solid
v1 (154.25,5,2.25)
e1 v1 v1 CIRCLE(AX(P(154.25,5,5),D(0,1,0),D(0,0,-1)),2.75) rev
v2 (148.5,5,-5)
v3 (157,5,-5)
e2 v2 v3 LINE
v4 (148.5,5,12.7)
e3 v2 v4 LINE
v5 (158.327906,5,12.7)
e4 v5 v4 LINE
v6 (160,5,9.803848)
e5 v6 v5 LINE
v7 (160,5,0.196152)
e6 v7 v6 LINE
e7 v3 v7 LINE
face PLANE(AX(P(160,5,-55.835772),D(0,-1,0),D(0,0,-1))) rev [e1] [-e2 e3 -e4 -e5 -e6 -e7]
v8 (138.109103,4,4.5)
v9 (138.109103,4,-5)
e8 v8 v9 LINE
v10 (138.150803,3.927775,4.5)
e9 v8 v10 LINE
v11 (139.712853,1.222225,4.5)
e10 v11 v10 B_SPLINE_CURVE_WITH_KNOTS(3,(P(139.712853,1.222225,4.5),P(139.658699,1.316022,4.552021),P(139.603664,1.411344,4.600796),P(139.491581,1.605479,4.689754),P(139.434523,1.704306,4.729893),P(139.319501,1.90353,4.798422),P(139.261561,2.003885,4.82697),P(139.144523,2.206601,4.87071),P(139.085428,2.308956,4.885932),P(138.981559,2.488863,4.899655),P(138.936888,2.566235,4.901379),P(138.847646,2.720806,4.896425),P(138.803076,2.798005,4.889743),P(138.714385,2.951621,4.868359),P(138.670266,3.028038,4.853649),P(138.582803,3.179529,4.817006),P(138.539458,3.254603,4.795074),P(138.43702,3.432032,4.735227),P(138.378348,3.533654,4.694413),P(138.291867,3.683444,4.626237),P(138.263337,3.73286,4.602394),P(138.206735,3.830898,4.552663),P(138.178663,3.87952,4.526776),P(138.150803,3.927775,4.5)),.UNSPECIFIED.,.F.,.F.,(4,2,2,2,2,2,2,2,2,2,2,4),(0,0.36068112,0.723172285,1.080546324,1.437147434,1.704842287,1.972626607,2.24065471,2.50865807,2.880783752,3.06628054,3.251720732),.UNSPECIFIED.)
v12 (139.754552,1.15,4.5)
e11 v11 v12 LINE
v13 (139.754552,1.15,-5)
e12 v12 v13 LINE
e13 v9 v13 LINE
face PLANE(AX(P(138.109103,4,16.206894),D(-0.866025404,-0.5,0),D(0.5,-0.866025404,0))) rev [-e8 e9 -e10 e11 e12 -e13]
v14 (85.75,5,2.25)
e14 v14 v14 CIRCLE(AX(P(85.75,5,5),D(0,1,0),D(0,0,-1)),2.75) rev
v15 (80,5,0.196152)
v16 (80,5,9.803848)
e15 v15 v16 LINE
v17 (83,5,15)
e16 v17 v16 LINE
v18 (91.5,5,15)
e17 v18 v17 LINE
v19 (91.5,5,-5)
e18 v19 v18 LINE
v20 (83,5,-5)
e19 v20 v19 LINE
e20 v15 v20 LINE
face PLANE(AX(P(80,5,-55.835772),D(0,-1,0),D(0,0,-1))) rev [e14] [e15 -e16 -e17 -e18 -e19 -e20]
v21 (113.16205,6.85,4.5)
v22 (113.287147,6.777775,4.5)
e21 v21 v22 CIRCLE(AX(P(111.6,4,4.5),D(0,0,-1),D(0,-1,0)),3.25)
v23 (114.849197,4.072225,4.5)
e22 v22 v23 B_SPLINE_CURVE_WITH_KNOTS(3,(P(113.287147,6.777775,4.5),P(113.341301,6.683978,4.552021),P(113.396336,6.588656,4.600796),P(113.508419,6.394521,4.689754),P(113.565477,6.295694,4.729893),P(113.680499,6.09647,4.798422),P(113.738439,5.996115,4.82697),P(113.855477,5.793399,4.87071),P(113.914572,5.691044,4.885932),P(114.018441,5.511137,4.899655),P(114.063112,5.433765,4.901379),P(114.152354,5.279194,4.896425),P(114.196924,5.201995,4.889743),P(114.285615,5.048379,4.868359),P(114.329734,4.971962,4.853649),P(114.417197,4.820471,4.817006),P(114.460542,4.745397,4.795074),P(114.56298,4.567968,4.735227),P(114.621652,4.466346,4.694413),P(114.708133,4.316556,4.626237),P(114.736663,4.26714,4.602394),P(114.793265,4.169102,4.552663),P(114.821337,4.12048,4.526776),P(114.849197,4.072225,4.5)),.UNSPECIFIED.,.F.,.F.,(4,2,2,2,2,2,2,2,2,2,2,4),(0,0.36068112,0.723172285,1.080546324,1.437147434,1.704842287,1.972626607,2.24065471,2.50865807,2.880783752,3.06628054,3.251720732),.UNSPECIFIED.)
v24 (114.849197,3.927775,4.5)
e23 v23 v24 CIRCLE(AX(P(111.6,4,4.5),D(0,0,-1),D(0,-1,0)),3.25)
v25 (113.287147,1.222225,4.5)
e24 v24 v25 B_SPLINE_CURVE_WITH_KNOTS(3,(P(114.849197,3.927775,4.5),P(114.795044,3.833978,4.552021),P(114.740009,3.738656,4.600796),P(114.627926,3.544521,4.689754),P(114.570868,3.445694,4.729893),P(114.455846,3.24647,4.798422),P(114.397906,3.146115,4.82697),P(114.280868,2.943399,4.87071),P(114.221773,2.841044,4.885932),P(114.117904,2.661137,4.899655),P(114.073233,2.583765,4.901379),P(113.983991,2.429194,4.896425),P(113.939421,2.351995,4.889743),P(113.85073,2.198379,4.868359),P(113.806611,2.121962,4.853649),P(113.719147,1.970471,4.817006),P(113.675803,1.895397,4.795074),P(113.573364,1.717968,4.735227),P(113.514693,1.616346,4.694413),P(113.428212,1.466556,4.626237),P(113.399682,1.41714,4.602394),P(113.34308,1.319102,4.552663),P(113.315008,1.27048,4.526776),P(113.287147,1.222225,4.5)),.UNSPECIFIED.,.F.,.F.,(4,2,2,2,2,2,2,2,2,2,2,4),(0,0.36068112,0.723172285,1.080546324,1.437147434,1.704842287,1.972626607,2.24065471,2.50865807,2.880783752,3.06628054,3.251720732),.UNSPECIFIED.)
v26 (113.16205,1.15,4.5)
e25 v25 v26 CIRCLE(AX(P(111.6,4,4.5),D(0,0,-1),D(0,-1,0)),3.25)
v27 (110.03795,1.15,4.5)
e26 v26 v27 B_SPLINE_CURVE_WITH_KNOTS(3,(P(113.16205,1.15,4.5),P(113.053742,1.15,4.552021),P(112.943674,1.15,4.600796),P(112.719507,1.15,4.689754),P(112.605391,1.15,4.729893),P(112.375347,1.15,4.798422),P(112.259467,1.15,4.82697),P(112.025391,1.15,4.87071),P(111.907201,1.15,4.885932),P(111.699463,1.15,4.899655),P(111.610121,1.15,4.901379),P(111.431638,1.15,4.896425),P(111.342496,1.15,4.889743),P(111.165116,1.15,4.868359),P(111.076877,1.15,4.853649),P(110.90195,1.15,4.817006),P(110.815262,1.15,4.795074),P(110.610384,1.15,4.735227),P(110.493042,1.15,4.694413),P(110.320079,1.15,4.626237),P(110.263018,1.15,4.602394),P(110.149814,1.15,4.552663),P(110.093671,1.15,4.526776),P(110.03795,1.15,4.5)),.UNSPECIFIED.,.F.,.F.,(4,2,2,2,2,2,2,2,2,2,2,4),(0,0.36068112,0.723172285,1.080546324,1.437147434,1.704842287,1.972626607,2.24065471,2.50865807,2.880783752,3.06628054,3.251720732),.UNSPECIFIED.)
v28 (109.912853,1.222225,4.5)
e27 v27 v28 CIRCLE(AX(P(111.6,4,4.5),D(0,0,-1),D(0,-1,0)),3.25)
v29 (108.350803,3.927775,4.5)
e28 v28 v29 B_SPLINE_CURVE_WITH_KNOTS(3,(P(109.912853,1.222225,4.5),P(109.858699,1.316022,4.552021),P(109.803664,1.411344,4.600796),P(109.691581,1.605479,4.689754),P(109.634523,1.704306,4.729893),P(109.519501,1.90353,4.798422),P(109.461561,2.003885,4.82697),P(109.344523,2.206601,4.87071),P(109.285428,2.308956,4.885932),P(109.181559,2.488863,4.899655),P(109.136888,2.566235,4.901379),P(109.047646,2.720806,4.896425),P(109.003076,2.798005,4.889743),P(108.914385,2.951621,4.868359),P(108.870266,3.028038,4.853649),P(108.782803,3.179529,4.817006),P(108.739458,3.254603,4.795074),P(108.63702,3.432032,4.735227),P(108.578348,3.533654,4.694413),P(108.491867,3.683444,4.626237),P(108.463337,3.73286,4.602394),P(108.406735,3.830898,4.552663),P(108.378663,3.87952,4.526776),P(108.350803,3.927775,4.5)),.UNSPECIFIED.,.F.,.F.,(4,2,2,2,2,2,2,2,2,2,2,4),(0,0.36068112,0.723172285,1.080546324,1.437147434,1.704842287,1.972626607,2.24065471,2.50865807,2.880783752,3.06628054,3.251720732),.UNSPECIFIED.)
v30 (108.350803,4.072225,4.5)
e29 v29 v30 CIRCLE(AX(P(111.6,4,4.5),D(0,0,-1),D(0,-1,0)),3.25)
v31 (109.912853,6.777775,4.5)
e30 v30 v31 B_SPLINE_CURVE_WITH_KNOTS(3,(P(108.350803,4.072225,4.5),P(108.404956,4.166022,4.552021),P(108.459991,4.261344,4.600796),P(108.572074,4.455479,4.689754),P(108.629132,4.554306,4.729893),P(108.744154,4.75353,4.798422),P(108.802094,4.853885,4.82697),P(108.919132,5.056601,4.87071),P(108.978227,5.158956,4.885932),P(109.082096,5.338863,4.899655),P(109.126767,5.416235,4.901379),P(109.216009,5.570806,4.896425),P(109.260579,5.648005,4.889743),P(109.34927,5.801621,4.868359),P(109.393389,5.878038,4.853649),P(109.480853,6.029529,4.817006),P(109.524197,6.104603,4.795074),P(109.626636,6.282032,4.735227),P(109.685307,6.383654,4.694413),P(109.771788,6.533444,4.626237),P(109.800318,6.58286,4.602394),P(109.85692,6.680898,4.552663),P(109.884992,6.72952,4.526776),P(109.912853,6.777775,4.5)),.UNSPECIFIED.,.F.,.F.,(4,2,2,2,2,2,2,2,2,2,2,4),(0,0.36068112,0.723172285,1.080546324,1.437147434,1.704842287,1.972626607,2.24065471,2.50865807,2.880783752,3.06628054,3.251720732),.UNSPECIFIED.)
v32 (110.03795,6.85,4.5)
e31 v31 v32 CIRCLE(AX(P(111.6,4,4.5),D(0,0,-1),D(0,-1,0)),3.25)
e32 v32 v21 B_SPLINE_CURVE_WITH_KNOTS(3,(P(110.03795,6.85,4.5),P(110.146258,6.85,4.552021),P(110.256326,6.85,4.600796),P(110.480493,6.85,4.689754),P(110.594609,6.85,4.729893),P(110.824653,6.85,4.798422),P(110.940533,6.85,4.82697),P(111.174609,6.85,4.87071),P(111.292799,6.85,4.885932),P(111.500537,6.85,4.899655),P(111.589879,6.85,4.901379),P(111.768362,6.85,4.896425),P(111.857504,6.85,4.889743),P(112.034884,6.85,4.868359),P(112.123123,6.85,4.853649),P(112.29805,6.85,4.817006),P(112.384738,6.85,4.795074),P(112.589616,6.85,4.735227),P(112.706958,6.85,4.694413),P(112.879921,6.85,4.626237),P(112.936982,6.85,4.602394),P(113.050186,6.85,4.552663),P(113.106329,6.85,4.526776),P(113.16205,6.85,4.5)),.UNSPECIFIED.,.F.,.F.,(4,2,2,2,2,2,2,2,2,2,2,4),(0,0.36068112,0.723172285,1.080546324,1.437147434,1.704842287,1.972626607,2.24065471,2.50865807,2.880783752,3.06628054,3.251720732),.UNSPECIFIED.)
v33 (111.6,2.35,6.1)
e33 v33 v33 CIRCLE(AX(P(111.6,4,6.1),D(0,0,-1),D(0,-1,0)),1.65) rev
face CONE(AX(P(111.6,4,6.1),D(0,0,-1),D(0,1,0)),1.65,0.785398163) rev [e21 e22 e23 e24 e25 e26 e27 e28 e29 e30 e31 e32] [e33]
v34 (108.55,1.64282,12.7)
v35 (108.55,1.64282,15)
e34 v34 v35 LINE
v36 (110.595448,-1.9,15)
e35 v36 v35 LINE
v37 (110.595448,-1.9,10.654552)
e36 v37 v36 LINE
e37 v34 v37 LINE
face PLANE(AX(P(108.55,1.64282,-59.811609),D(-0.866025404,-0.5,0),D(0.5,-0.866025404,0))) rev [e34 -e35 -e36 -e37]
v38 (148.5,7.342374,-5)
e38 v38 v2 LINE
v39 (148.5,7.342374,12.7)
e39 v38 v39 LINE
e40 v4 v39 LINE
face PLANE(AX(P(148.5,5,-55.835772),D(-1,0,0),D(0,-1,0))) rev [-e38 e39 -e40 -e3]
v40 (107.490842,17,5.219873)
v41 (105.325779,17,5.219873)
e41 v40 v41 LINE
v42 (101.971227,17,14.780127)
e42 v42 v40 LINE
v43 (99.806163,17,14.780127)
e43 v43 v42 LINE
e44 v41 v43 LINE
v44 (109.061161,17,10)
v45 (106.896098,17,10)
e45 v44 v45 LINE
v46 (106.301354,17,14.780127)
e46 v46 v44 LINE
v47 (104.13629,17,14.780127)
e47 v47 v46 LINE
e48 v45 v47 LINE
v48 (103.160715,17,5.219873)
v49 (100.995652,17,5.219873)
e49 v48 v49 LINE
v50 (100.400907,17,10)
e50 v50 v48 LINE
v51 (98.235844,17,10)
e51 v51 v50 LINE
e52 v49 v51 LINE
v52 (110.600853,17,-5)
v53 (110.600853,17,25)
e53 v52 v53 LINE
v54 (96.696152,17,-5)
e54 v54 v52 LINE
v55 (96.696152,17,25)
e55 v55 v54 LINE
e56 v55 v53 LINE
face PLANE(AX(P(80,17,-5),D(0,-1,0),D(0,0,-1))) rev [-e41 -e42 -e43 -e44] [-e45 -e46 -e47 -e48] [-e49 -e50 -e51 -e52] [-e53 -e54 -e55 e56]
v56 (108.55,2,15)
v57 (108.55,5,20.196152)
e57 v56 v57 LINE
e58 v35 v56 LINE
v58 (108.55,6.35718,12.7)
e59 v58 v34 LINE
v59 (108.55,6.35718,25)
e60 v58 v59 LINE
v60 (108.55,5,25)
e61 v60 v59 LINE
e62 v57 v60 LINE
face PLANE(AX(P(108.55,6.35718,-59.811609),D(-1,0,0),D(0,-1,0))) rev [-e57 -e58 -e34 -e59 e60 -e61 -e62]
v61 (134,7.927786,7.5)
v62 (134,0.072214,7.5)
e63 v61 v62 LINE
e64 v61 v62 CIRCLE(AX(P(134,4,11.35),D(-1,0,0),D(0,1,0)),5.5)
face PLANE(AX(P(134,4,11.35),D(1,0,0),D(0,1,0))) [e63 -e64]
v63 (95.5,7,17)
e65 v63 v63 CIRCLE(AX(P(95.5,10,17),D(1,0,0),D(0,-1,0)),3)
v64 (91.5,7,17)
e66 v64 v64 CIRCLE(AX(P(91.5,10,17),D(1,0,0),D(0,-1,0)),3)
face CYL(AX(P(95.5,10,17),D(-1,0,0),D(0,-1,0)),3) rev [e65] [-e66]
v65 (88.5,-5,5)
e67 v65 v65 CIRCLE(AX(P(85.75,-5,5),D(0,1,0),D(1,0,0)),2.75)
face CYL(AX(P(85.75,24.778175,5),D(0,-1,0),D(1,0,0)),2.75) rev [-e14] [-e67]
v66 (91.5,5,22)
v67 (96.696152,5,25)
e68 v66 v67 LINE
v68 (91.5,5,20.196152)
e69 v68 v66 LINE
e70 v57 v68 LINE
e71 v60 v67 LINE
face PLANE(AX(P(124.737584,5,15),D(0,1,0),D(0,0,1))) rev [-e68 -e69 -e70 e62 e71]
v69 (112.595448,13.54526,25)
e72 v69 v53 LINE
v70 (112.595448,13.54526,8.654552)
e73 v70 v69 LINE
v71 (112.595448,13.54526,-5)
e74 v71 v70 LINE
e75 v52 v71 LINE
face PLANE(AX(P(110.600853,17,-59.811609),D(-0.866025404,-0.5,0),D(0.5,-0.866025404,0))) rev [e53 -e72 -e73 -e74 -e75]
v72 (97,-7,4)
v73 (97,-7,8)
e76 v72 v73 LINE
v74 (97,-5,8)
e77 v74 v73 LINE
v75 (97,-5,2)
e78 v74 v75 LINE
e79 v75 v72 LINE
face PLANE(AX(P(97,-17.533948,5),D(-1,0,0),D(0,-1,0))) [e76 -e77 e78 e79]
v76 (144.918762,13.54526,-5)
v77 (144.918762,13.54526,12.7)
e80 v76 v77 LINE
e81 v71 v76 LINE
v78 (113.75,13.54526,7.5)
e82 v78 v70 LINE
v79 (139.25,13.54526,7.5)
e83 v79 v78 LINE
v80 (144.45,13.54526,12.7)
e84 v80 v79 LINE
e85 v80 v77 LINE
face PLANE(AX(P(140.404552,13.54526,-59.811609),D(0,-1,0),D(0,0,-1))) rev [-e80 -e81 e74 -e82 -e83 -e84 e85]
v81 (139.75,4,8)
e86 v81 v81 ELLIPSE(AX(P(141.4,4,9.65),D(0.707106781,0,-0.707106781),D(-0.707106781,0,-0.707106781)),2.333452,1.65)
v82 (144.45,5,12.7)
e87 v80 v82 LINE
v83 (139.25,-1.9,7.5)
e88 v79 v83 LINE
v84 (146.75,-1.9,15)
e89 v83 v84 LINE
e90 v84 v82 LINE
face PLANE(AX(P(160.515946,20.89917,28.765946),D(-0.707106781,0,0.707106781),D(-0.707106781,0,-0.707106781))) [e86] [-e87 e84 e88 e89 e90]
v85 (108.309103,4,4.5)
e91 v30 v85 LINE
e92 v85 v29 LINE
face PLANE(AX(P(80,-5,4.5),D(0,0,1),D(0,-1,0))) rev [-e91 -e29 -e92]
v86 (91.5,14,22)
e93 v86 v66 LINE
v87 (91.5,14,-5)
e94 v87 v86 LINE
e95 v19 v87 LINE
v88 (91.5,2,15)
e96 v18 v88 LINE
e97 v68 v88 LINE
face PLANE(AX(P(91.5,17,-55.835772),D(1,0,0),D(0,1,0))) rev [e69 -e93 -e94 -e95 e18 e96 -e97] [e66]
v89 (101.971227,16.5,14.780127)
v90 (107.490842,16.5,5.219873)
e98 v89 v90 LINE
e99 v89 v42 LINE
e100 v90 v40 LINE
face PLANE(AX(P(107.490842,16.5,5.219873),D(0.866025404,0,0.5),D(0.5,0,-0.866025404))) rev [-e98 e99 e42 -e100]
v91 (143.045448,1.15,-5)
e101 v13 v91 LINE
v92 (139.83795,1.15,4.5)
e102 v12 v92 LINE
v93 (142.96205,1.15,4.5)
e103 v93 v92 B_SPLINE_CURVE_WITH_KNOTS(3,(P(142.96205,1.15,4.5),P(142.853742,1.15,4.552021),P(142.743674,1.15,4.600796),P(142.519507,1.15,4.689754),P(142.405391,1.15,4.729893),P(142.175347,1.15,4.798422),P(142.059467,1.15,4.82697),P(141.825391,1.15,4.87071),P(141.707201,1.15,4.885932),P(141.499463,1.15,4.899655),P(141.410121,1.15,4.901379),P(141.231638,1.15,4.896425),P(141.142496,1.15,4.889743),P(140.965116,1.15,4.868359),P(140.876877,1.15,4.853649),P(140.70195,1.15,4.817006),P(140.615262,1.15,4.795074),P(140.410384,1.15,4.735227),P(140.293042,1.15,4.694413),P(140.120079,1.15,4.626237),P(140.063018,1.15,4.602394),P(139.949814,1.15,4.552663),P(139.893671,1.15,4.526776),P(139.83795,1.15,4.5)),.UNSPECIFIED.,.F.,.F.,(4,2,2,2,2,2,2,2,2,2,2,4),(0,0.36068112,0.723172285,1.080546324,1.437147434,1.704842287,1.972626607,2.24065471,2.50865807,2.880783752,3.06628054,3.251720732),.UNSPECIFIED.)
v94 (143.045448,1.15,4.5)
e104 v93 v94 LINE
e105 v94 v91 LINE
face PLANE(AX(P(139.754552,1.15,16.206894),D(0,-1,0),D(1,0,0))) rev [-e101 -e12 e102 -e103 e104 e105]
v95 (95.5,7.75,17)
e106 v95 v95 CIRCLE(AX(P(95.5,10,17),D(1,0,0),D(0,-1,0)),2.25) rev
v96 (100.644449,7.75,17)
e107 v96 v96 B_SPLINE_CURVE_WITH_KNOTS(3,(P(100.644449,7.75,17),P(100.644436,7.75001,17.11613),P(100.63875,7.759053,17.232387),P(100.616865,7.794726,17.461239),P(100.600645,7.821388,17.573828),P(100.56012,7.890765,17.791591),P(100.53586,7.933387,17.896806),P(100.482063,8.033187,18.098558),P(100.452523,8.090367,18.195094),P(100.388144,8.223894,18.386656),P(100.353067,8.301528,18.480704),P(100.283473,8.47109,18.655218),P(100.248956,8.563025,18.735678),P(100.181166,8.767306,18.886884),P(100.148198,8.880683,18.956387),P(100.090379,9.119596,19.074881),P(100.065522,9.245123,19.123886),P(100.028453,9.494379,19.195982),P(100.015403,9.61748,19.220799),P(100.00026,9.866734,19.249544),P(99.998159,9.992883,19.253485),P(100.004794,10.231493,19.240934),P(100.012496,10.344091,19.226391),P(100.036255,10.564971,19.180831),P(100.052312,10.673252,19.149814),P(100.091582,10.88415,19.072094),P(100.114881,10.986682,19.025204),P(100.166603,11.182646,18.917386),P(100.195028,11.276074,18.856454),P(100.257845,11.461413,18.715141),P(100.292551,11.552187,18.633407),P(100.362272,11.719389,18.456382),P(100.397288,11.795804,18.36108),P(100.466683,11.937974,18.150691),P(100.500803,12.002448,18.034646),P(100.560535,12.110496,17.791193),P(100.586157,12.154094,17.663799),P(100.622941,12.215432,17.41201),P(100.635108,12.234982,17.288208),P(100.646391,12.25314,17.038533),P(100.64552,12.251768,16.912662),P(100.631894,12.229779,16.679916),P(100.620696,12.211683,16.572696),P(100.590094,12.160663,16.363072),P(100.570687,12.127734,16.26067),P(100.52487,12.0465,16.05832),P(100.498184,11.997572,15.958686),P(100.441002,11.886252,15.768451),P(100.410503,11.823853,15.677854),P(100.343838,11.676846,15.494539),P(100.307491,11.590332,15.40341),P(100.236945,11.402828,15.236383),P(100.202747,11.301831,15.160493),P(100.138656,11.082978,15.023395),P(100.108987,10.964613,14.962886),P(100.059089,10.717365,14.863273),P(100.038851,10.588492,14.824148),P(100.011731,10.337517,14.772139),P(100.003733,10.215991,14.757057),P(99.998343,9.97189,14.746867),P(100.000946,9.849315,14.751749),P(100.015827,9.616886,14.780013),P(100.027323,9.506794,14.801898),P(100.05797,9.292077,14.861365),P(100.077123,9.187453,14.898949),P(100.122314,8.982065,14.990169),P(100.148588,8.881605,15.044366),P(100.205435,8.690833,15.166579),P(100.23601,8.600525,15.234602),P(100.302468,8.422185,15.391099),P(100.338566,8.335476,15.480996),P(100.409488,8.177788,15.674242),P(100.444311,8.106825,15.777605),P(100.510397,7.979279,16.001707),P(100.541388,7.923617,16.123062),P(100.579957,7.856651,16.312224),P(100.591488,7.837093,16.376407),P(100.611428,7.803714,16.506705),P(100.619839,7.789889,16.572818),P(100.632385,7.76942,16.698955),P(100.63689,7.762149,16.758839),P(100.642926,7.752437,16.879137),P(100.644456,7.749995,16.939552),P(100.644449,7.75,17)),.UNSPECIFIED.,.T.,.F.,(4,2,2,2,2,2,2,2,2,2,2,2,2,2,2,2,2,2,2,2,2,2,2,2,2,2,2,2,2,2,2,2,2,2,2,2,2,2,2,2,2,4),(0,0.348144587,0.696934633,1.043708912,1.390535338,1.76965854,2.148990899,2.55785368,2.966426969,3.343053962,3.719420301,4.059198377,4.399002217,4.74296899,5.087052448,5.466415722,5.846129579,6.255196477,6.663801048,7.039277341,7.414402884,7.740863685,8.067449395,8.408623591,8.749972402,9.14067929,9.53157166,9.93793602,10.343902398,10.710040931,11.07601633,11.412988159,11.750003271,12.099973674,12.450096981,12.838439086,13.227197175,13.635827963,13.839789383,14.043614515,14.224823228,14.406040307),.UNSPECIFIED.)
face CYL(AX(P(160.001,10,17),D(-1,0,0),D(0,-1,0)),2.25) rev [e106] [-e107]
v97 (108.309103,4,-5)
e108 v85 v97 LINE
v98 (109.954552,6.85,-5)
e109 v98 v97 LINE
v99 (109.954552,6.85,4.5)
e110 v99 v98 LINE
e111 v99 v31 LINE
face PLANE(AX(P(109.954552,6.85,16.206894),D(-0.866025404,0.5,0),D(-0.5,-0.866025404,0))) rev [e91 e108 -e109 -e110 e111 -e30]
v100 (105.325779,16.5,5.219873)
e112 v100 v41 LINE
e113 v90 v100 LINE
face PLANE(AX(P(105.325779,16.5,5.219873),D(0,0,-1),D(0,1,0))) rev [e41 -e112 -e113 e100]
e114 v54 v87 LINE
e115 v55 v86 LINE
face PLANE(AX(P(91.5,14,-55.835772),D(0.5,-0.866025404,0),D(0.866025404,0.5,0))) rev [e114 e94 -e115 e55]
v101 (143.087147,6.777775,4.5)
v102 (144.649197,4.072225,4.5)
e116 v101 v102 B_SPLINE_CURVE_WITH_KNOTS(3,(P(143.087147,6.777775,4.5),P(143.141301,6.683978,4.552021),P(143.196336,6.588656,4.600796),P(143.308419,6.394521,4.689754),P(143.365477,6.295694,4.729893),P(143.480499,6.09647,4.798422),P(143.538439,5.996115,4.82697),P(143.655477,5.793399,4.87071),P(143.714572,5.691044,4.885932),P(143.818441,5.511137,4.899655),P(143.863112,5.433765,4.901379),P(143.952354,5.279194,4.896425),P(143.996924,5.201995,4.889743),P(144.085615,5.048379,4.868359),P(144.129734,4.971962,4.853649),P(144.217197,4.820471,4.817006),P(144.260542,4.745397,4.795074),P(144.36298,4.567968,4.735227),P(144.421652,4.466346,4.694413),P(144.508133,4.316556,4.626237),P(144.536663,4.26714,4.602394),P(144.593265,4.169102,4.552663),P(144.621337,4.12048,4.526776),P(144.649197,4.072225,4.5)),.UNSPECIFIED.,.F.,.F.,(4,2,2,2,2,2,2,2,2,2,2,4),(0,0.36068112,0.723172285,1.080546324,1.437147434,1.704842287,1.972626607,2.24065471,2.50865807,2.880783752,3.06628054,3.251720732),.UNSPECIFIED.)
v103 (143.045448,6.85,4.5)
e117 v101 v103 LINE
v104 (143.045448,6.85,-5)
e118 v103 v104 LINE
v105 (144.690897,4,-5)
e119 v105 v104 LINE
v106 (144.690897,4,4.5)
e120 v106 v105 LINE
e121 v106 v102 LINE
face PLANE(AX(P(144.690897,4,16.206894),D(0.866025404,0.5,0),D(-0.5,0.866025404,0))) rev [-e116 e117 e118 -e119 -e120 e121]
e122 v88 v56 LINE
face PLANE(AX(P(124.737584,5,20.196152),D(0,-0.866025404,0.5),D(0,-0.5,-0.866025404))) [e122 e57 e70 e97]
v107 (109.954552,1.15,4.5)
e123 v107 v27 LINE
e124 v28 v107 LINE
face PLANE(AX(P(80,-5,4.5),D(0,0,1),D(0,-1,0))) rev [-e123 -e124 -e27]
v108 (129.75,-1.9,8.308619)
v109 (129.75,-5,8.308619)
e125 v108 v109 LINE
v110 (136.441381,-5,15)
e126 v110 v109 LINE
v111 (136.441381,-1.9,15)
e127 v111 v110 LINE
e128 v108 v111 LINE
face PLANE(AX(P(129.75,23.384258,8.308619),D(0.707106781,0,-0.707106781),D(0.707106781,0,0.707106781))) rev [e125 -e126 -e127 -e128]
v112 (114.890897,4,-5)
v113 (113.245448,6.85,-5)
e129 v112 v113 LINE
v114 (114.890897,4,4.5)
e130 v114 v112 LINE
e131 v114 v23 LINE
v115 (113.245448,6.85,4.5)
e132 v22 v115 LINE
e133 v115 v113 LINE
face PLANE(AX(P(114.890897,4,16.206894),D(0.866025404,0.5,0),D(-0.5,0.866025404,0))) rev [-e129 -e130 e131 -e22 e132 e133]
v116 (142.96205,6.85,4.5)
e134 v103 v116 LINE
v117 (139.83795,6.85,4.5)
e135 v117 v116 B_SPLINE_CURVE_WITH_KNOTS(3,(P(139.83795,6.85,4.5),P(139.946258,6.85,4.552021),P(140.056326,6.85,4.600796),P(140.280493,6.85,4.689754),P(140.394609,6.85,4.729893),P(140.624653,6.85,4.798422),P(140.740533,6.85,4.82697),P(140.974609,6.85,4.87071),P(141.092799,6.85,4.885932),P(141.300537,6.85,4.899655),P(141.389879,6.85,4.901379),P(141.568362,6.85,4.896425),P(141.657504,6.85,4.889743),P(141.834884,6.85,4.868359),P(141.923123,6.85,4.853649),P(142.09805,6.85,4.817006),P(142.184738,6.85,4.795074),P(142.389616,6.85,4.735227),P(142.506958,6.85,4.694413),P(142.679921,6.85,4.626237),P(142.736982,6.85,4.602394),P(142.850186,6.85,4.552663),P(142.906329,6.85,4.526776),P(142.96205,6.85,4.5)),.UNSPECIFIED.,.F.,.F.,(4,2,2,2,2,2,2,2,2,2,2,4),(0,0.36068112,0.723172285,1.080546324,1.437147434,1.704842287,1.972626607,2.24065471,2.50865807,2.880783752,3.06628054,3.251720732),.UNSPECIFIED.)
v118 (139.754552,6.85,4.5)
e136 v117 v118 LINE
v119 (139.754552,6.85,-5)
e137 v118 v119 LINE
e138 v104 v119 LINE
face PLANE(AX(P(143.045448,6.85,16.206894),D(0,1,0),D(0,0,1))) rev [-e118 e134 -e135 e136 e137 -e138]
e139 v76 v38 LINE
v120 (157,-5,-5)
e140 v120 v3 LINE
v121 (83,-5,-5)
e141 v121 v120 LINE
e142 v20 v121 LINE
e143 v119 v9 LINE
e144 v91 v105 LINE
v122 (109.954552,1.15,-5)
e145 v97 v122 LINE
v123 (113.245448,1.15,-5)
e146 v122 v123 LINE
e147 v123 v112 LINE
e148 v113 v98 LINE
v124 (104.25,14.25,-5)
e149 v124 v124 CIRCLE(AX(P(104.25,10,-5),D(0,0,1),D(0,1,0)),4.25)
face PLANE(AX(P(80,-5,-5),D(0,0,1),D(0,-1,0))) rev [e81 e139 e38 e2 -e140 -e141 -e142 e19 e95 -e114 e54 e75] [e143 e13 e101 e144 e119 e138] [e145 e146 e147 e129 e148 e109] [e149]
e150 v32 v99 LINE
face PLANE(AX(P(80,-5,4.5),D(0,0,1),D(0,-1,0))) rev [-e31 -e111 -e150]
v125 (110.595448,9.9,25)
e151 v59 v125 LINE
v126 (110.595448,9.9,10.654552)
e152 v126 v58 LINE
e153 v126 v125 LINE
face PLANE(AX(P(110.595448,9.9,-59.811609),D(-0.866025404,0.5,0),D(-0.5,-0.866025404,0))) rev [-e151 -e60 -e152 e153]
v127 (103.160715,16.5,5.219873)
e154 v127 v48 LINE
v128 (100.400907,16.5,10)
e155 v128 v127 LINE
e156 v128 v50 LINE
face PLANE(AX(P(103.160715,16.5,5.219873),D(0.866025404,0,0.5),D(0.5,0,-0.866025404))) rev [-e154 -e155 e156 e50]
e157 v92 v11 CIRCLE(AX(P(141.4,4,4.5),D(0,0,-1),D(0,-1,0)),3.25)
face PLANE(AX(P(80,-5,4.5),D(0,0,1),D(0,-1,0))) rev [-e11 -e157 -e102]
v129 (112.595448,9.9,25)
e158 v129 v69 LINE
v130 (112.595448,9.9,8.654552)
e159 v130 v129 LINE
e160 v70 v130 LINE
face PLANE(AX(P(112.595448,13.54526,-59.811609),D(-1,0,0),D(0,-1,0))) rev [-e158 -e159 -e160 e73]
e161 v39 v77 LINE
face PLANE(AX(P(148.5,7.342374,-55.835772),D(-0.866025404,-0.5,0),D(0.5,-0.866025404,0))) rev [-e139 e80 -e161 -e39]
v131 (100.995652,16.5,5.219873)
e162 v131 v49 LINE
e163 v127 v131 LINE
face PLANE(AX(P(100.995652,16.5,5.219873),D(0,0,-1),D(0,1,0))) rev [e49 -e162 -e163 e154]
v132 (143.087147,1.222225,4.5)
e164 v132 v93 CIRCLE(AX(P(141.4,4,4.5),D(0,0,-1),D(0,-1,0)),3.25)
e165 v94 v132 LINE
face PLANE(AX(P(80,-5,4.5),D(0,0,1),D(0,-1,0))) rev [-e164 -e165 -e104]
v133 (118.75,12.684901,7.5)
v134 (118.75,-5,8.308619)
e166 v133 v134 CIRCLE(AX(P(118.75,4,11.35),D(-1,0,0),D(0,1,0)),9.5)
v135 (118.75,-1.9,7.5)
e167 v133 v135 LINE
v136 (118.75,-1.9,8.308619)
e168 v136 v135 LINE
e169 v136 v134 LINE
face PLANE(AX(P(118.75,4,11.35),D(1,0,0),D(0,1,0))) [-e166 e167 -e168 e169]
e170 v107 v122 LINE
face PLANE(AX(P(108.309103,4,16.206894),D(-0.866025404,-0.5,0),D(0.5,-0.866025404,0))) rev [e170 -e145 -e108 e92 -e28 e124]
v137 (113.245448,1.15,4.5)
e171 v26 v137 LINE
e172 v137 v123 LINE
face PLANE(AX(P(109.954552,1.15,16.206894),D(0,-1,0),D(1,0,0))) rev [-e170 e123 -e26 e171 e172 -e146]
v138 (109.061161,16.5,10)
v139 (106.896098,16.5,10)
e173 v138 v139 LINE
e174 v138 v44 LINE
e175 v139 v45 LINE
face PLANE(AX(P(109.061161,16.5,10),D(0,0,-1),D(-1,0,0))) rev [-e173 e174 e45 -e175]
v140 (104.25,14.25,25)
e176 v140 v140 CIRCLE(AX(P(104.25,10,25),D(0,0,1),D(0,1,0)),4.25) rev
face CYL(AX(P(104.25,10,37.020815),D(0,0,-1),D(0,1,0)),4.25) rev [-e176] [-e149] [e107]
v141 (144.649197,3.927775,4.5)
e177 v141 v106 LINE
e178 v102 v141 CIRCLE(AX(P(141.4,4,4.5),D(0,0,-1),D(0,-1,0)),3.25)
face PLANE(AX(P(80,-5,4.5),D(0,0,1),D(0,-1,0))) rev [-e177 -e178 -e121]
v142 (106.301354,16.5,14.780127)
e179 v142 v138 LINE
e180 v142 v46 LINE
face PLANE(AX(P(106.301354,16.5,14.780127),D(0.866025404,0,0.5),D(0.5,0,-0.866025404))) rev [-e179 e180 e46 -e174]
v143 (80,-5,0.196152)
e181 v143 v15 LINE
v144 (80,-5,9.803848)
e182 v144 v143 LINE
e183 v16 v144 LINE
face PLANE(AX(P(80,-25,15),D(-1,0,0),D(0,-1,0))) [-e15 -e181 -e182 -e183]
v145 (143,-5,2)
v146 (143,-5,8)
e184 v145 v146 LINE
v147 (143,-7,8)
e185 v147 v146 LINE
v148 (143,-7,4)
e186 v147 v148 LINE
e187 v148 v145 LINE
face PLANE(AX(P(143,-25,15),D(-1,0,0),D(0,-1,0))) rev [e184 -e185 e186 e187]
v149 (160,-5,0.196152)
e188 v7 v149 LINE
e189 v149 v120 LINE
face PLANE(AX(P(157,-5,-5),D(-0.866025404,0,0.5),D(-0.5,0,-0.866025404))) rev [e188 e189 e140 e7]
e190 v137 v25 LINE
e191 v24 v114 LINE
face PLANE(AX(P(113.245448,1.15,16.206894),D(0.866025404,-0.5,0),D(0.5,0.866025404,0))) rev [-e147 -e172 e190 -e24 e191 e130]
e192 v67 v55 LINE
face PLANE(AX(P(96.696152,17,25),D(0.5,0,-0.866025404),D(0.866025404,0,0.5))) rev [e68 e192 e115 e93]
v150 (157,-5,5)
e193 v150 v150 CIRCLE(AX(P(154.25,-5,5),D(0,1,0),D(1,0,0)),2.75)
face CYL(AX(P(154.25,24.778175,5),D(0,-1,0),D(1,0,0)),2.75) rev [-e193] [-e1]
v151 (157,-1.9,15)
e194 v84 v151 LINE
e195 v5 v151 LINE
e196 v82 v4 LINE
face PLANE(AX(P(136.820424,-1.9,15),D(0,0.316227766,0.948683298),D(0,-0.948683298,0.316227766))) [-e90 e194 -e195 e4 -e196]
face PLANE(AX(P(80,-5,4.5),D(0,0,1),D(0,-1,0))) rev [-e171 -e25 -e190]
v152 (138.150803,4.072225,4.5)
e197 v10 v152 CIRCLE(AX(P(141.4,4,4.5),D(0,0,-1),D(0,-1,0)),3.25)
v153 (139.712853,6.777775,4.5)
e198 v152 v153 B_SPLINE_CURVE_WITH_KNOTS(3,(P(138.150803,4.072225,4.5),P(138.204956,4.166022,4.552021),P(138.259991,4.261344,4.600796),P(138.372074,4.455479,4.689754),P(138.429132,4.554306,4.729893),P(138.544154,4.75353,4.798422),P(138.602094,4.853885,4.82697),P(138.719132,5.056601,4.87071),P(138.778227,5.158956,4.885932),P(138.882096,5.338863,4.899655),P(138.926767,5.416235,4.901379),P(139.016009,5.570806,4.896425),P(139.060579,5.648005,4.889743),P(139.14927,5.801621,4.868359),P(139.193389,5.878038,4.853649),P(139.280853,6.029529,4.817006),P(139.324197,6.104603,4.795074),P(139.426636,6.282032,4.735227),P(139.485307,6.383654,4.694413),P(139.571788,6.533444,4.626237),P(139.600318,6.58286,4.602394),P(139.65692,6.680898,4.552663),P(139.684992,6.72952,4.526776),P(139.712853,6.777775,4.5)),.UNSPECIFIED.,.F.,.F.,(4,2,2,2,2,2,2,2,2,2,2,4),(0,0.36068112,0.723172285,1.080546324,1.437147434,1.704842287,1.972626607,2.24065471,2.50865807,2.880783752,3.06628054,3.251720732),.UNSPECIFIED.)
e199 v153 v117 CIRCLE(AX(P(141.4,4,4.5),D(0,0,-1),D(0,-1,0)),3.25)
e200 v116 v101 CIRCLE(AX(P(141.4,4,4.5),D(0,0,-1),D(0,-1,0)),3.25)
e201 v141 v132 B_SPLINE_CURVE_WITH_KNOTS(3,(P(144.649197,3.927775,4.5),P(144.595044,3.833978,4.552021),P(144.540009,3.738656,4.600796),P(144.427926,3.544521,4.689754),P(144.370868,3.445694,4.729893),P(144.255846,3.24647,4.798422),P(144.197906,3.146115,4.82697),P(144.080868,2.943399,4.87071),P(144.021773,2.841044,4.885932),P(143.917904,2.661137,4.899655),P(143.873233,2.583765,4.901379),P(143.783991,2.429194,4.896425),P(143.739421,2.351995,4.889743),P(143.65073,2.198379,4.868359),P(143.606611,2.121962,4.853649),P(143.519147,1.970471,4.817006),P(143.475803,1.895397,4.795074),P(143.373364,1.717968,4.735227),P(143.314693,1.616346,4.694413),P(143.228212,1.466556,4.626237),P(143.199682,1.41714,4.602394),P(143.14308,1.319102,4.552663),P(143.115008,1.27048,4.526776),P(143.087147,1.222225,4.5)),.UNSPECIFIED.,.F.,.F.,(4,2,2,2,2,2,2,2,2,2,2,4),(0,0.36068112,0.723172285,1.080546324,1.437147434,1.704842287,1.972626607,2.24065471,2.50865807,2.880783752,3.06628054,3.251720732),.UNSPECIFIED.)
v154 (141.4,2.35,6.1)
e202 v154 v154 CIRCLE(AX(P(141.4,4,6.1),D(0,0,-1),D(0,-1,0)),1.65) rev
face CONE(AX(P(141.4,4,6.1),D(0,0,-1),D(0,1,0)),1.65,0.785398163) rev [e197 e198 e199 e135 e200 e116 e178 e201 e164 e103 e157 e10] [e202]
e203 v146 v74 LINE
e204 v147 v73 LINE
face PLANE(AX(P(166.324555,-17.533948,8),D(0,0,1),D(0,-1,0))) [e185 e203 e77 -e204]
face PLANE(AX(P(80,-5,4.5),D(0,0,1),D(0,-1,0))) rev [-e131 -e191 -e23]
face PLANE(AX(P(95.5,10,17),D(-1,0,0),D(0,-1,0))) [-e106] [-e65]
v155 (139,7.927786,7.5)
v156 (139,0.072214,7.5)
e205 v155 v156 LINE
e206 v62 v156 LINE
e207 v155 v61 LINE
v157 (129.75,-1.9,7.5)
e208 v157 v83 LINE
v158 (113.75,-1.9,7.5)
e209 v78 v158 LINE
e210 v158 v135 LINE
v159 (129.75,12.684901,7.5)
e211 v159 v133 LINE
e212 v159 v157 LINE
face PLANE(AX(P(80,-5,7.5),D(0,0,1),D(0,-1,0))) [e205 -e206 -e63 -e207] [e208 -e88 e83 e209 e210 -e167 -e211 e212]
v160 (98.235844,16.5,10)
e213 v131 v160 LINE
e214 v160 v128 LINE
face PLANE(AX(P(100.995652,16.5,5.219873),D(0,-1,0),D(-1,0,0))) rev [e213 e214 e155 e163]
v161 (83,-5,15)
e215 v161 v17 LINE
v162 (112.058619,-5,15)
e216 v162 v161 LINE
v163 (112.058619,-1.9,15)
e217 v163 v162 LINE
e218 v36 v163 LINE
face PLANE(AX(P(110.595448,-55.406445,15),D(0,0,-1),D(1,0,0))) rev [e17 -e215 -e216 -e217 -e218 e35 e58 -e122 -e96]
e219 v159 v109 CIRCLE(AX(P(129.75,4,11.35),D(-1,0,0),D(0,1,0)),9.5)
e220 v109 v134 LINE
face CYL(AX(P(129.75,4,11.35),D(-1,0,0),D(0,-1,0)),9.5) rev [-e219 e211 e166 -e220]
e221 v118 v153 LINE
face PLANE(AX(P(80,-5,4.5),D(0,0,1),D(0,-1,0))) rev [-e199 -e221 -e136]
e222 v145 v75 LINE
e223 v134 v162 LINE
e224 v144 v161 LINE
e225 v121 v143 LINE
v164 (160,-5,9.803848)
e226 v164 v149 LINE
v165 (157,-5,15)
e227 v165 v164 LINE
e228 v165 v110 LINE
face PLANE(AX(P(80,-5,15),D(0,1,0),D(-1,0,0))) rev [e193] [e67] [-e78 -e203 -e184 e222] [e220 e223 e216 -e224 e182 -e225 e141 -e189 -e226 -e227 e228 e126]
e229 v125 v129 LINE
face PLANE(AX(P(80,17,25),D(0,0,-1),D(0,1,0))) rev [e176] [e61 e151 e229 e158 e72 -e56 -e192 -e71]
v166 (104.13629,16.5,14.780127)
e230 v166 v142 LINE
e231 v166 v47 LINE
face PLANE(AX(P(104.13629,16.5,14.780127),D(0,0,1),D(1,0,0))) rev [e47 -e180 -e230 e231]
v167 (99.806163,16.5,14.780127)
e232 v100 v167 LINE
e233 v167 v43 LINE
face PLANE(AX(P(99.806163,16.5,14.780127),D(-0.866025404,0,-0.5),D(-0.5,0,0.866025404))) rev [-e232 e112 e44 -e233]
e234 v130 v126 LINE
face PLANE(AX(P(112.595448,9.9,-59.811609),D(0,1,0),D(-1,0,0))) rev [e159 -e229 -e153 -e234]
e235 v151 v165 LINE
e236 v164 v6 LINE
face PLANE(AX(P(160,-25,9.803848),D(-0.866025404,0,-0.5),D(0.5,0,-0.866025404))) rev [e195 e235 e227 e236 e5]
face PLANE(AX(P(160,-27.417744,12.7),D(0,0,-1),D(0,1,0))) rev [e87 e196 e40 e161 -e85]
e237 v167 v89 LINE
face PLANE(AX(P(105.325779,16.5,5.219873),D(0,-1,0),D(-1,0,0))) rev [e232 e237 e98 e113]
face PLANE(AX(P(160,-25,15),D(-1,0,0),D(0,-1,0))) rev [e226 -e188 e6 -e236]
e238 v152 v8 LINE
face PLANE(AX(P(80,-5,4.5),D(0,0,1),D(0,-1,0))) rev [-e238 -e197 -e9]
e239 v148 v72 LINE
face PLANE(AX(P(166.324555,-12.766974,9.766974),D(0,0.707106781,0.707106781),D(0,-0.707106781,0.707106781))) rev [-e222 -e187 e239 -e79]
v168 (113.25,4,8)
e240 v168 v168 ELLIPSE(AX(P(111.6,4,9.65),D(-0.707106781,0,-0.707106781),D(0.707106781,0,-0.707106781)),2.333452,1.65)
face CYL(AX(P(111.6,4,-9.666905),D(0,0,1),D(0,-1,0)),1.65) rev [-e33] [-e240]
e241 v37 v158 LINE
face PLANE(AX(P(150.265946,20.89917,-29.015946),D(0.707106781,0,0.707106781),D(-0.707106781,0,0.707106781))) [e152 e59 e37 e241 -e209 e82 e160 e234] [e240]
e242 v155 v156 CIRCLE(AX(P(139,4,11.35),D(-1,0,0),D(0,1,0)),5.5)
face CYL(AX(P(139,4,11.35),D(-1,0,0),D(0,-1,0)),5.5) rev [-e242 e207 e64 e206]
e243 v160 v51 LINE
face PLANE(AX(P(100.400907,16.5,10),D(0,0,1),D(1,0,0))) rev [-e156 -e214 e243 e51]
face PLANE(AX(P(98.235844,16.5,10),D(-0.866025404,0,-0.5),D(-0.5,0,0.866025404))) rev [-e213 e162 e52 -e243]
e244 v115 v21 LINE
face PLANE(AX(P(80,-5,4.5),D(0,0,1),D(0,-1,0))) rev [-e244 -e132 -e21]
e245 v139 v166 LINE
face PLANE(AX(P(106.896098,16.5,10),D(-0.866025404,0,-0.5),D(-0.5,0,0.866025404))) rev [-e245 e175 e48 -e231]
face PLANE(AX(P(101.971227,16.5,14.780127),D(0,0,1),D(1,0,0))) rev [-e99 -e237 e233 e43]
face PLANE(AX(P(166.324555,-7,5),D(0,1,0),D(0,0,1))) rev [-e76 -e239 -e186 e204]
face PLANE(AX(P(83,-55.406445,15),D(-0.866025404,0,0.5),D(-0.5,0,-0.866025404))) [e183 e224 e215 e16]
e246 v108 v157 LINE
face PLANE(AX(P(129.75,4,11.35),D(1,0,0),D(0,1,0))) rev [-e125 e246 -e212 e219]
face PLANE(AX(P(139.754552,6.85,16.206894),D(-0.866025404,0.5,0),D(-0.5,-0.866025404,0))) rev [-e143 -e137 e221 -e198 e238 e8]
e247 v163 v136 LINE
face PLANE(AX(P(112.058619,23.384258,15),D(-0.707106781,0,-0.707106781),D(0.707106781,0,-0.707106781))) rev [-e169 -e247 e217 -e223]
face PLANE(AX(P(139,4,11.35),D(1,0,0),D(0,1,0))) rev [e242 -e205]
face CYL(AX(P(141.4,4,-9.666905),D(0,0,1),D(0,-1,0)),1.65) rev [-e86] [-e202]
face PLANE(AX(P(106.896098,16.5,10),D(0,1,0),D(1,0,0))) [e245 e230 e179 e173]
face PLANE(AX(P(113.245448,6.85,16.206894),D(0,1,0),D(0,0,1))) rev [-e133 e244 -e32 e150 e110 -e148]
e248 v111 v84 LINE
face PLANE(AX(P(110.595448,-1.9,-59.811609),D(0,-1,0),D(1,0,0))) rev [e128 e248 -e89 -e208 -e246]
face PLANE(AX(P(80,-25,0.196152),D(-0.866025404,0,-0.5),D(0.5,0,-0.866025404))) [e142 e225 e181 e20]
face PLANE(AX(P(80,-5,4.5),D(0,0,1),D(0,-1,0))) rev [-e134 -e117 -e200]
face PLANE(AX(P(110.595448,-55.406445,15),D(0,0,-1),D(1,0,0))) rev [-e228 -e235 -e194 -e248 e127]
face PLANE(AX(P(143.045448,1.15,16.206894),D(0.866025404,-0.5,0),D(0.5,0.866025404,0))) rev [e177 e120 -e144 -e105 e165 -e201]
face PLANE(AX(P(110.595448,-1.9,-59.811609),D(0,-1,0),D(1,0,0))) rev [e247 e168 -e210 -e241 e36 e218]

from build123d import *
from OCP.BRepFilletAPI import BRepFilletAPI_MakeChamfer

# Parameters (mm, degrees)
AUFSATZ_LINEAR_AUSTRAGEN1_DEPTH       = 80
SKIZZE2_R                             = 4.25
SCHNITT_LINEAR_AUSTRAGEN1_DEPTH       = 30
SKIZZE3_R                             = 1.65
SCHNITT_LINEAR_AUSTRAGEN2_DEPTH       = 17.5
SKIZZE4_R                             = 1.65
SCHNITT_LINEAR_AUSTRAGEN3_DEPTH       = 30
SCHNITT_LINEAR_START                  = -22
SKIZZE5_R                             = 2.75
SCHNITT_LINEAR_AUSTRAGEN4_DEPTH       = 22
SKIZZE6_R                             = 2.75
SCHNITT_LINEAR_AUSTRAGEN5_DEPTH       = 10
SCHNITT_LINEAR_AUSTRAGEN6_DEPTH       = 9.5
SCHNITT_LINEAR_START_2                = -12.5
SKIZZE8_W                             = 11.5
SKIZZE8_H                             = 12
SCHNITT_LINEAR_AUSTRAGEN7_DEPTH       = 30
SCHNITT_LINEAR_START_3                = 10.2
SKIZZE9_R                             = 9.5
SCHNITT_LINEAR_AUSTRAGEN8_DEPTH       = 11
SCHNITT_LINEAR_START_4                = 25.45
SKIZZE10_R                            = 5.5
SCHNITT_LINEAR_AUSTRAGEN9_DEPTH       = 5
AUFSATZ_LINEAR_START                  = -18.545259589
AUFSATZ_LINEAR_AUSTRAGEN2_DEPTH       = 15.445259589
SCHNITT_LINEAR_START_5                = -20.5
SKIZZE12_R                            = 1.65
SCHNITT_LINEAR_AUSTRAGEN10_DEPTH      = 20.5
FASE1_SIZE                            = 1.6
SKIZZE15_W                            = 20
SKIZZE15_H                            = 10
SCHNITT_LINEAR_AUSTRAGEN12_DEPTH      = 80
SCHNITT_LINEAR_START_6                = -15.44526
SCHNITT_LINEAR_AUSTRAGEN13_DEPTH      = 15.44526
SCHNITT_LINEAR_START_7                = -3.1
SKIZZE17_W                            = 49.404551733
SKIZZE17_H                            = 10
SCHNITT_LINEAR_AUSTRAGEN14_DEPTH      = 3.1
SCHNITT_LINEAR_AUSTRAGEN17_DEPTH      = 11
AUFSATZ_LINEAR_AUSTRAGEN3_REACH       = 87.346
SKIZZE21_W                            = 10
SKIZZE21_H                            = 10
SCHNITT_LINEAR_AUSTRAGEN18_DEPTH      = 30.595448267
SCHNITT_LINEAR_AUSTRAGEN19_REACH      = 76.674
SCHNITT_LINEAR_AUSTRAGEN19_END_RADIUS = 4.25
SKIZZE22_R                            = 2.25
SKIZZE23_R                            = 3
SCHNITT_LINEAR_AUSTRAGEN20_DEPTH      = 4
FASE2_SIZE                            = 3
FASE2_SIZE2                           = 5.196152423
AUFSATZ_LINEAR_START_2                = -17
AUFSATZ_LINEAR_AUSTRAGEN4_DEPTH       = 46
FASE3_SIZE                            = 3
FASE3_SIZE2                           = 5.196152423
FASE4_SIZE                            = 3
FASE4_SIZE2                           = 5.196152423
SCHNITT_LINEAR_AUSTRAGEN23_DEPTH      = 3.1
SCHNITT_LINEAR_AUSTRAGEN22_DEPTH      = 0.5
K_RPER_VERSCHIEBEN_KOPIEREN1_ANGLE    = 90


# Read off the part's stored shape, not the designer's step: Aufsatz-Linear austragen2, Schnitt-Linear austragen17
with BuildPart() as part:
    # Skizze1 → Aufsatz-Linear austragen1 (new body)
    with BuildSketch(Plane(origin=(0, 0, 0), x_dir=(0, 0, -1), z_dir=(1, 0, 0))):
        Polygon((0, 0), (0, 20), (-22, 20), (-22, -10), (20, -10), (20, 0), align=None)
    extrude(amount=AUFSATZ_LINEAR_AUSTRAGEN1_DEPTH)

    # Skizze2 → Schnitt-Linear austragen1 (cut)
    with BuildSketch(Plane(origin=(0, 20, 0), x_dir=(1, 0, 0), z_dir=(0, 1, 0))):
        with Locations(Location((55.75, -15, 0), (0, 0, 270))):
            Circle(SKIZZE2_R)
    extrude(amount=-SCHNITT_LINEAR_AUSTRAGEN1_DEPTH, mode=Mode.SUBTRACT)

    # Skizze3 → Schnitt-Linear austragen2 (cut)
    with BuildSketch(Plane.XZ.offset(10)):
        Polygon((49.399147039, 22), (47.404551733, 18.545259589), (47.404551733, 14.9), (49.404551733, 14.9), (51.45, 11.357179677), (51.45, 6.642820323), (49.404551733, 3.1), (17.595448267, 3.1), (15.55, 6.642820323), (15.55, 11.357179677), (17.595448267, 14.9), (19.595448267, 14.9), (19.595448267, 18.545259589), (0, 18.545259589), (0, 22), align=None)
        with Locations(Location((48.4, 9, 0), (0, 0, 270))):
            Circle(SKIZZE3_R, mode=Mode.SUBTRACT)
        with Locations(Location((18.6, 9, 0), (0, 0, 270))):
            Circle(SKIZZE3_R, mode=Mode.SUBTRACT)
    extrude(amount=-SCHNITT_LINEAR_AUSTRAGEN2_DEPTH, mode=Mode.SUBTRACT)

    # Skizze4 → Schnitt-Linear austragen3 (cut)
    with BuildSketch(Plane.XZ.offset(10)):
        with Locations(Location((18.6, 9, 0), (0, 0, 270))):
            Circle(SKIZZE4_R)
        with Locations(Location((48.4, 9, 0), (0, 0, 270))):
            Circle(SKIZZE4_R)
    extrude(amount=-SCHNITT_LINEAR_AUSTRAGEN3_DEPTH, mode=Mode.SUBTRACT)

    # Skizze5 → Schnitt-Linear austragen4 (cut)
    with BuildSketch(Plane(origin=(0, 0, 0), x_dir=(-1, 0, 0), z_dir=(0, 0, -1)).offset(SCHNITT_LINEAR_START)):
        with Locations((-5.75, 10)):
            Circle(SKIZZE5_R)
        with Locations((-74.25, 10)):
            Circle(SKIZZE5_R)
    extrude(amount=SCHNITT_LINEAR_AUSTRAGEN4_DEPTH, mode=Mode.SUBTRACT)

    # Skizze6 → Schnitt-Linear austragen5 (cut)
    with BuildSketch(Plane(origin=(0, 0, 0), x_dir=(1, 0, 0), z_dir=(0, 1, 0))):
        with Locations(Location((40, 10, 0), (0, 0, 270))):
            Circle(SKIZZE6_R)
    extrude(amount=-SCHNITT_LINEAR_AUSTRAGEN5_DEPTH, mode=Mode.SUBTRACT)

    # Skizze7 → Schnitt-Linear austragen6 (cut)
    with BuildSketch(Plane(origin=(0, 20, 0), x_dir=(1, 0, 0), z_dir=(0, 1, 0))):
        Polygon((21.890896534, -9), (20.245448267, -6.15), (16.954551733, -6.15), (15.309103466, -9), (16.954551733, -11.85), (20.245448267, -11.85), align=None)
        Polygon((51.690896534, -9), (50.045448267, -6.15), (46.754551733, -6.15), (45.109103466, -9), (46.754551733, -11.85), (50.045448267, -11.85), align=None)
    extrude(amount=-SCHNITT_LINEAR_AUSTRAGEN6_DEPTH, mode=Mode.SUBTRACT)

    # Skizze8 → Schnitt-Linear austragen7 (cut)
    with BuildSketch(Plane.XZ.offset(-7.5).offset(SCHNITT_LINEAR_START_2)):
        Polygon((49.399147039, 22), (47.404551733, 18.545259589), (15.081237719, 18.545259589), (11.5, 12.342373906), (11.5, 10), (0, 10), (0, 22), align=None)
        with Locations((74.25, 16)):
            Rectangle(SKIZZE8_W, SKIZZE8_H)
    extrude(amount=SCHNITT_LINEAR_AUSTRAGEN7_DEPTH, mode=Mode.SUBTRACT)

    # Skizze9 → Schnitt-Linear austragen8 (cut)
    with BuildSketch(Plane.ZY.offset(-51.45).offset(SCHNITT_LINEAR_START_3)):
        with Locations((9, 3.65)):
            Circle(SKIZZE9_R)
    extrude(amount=SCHNITT_LINEAR_AUSTRAGEN8_DEPTH, mode=Mode.SUBTRACT)

    # Skizze10 → Schnitt-Linear austragen9 (cut)
    with BuildSketch(Plane.ZY.offset(-51.45).offset(SCHNITT_LINEAR_START_4)):
        with Locations((9, 3.65)):
            Circle(SKIZZE10_R)
    extrude(amount=SCHNITT_LINEAR_AUSTRAGEN9_DEPTH, mode=Mode.SUBTRACT)

    # Aufsatz-Linear austragen2 outline → Aufsatz-Linear austragen2 (add)
    with BuildSketch(Plane(origin=(0, 0, 0), x_dir=(-1, 0, 0), z_dir=(0, 0, -1)).offset(AUFSATZ_LINEAR_START)):
        Polygon((-46.25, 7.5), (-51.45, 7.5), (-51.45, 2.3), align=None)
        Polygon((-15.55, 7.5), (-20.75, 7.5), (-15.55, 2.3), align=None)
    extrude(amount=AUFSATZ_LINEAR_AUSTRAGEN2_DEPTH)

    # Skizze12 → Schnitt-Linear austragen10 (cut)
    with BuildSketch(Plane(origin=(0, 10.5, 0), x_dir=(1, 0, 0), z_dir=(0, 1, 0)).offset(SCHNITT_LINEAR_START_5)):
        with Locations(Location((18.6, -9, 0), (0, 0, 90))):
            Circle(SKIZZE12_R)
        with Locations(Location((48.4, -9, 0), (0, 0, 90))):
            Circle(SKIZZE12_R)
    extrude(amount=SCHNITT_LINEAR_AUSTRAGEN10_DEPTH, mode=Mode.SUBTRACT)

    # Fase1
    # the kernel refuses this chamfer: 1.6 mm, written as the material it takes off along each edge
    with BuildSketch(Plane(origin=(18.6, 10.5, 9), x_dir=(0, 0, -1), z_dir=(-1, 0, 0))) as fase1_piece_1_section:
        Polygon((1.65 + FASE1_SIZE, 0), (1.65, FASE1_SIZE), (1.65, 0), align=None)
    fase1_piece_1 = revolve(axis=Axis((18.6, 10.5, 9), (0, -1, 0)), mode=Mode.PRIVATE)
    fase1_piece_1 = split(fase1_piece_1, bisect_by=Plane(origin=(20.016275588, 9.716390068, 12.246938724), z_dir=(-0.8660254037844389, 0, -0.4999999999999995)), keep=Keep.TOP, mode=Mode.PRIVATE)
    fase1_piece_1 = split(fase1_piece_1, bisect_by=Plane(origin=(18.6, 9.716390068, 11.85), z_dir=(0, 0, -1)), keep=Keep.TOP, mode=Mode.PRIVATE)
    fase1_piece_1 = split(fase1_piece_1, bisect_by=Plane(origin=(22.120069214, 9.716390068, 9.396938724), z_dir=(-0.8660254037844397, 0, 0.4999999999999981)), keep=Keep.TOP, mode=Mode.PRIVATE)
    fase1_piece_1 = split(fase1_piece_1, bisect_by=Plane(origin=(17.183724412, 9.716390068, 12.246938724), z_dir=(0.8660254037844387, 0, -0.4999999999999999)), keep=Keep.TOP, mode=Mode.PRIVATE)
    fase1_piece_1 = split(fase1_piece_1, bisect_by=Plane(origin=(18.6, 9.716390068, 6.15), z_dir=(0, 0, 1)), keep=Keep.TOP, mode=Mode.PRIVATE)
    fase1_piece_1 = split(fase1_piece_1, bisect_by=Plane(origin=(15.079930786, 9.716390068, 9.396938724), z_dir=(0.8660254037844385, 0, 0.5000000000000003)), keep=Keep.TOP, mode=Mode.PRIVATE)
    add(fase1_piece_1, mode=Mode.SUBTRACT)
    with BuildSketch(Plane(origin=(48.4, 10.5, 9), x_dir=(0, 0, -1), z_dir=(-1, 0, 0))) as fase1_piece_2_section:
        Polygon((1.65 + FASE1_SIZE, 0), (1.65, FASE1_SIZE), (1.65, 0), align=None)
    fase1_piece_2 = revolve(axis=Axis((48.4, 10.5, 9), (0, -1, 0)), mode=Mode.PRIVATE)
    fase1_piece_2 = split(fase1_piece_2, bisect_by=Plane(origin=(49.816275588, 9.716390068, 12.246938724), z_dir=(-0.8660254037844392, 0, -0.4999999999999991)), keep=Keep.TOP, mode=Mode.PRIVATE)
    fase1_piece_2 = split(fase1_piece_2, bisect_by=Plane(origin=(48.4, 9.716390068, 11.85), z_dir=(0, 0, -1)), keep=Keep.TOP, mode=Mode.PRIVATE)
    fase1_piece_2 = split(fase1_piece_2, bisect_by=Plane(origin=(51.920069214, 9.716390068, 9.396938724), z_dir=(-0.8660254037844392, 0, 0.49999999999999917)), keep=Keep.TOP, mode=Mode.PRIVATE)
    fase1_piece_2 = split(fase1_piece_2, bisect_by=Plane(origin=(46.983724412, 9.716390068, 12.246938724), z_dir=(0.8660254037844384, 0, -0.5000000000000006)), keep=Keep.TOP, mode=Mode.PRIVATE)
    fase1_piece_2 = split(fase1_piece_2, bisect_by=Plane(origin=(48.4, 9.716390068, 6.15), z_dir=(0, 0, 1)), keep=Keep.TOP, mode=Mode.PRIVATE)
    fase1_piece_2 = split(fase1_piece_2, bisect_by=Plane(origin=(44.879930786, 9.716390068, 9.396938724), z_dir=(0.8660254037844386, 0, 0.5000000000000001)), keep=Keep.TOP, mode=Mode.PRIVATE)
    add(fase1_piece_2, mode=Mode.SUBTRACT)

    # Skizze15 → Schnitt-Linear austragen12 (cut)
    with BuildSketch(Plane(origin=(80, 0, 0), x_dir=(0, 0, -1), z_dir=(1, 0, 0))):
        with Locations((10, -5)):
            Rectangle(SKIZZE15_W, SKIZZE15_H)
    extrude(amount=-SCHNITT_LINEAR_AUSTRAGEN12_DEPTH, mode=Mode.SUBTRACT)

    # Skizze16 → Schnitt-Linear austragen13 (cut)
    with BuildSketch(Plane.XY.offset(18.545259589).offset(SCHNITT_LINEAR_START_6)):
        Polygon((0, -10), (0, 2.3), (15.55, 2.3), (19.595448267, 6.345448267), (19.595448267, -10), align=None)
    extrude(amount=SCHNITT_LINEAR_AUSTRAGEN13_DEPTH, mode=Mode.SUBTRACT)

    # Skizze17 → Schnitt-Linear austragen14 (cut)
    with BuildSketch(Plane.XY.offset(3.1).offset(SCHNITT_LINEAR_START_7)):
        with Locations((24.702275867, -5)):
            Rectangle(SKIZZE17_W, SKIZZE17_H)
    extrude(amount=SCHNITT_LINEAR_AUSTRAGEN14_DEPTH, mode=Mode.SUBTRACT)

    # Schnitt-Linear austragen17 outline → Schnitt-Linear austragen17 (cut)
    with BuildSketch(Plane(origin=(30.25, 0, 0), x_dir=(0, 0, -1), z_dir=(1, 0, 0))):
        with BuildLine():
            ThreePointArc((0, 0.608618735), (-0.109374334, 0.302347799), (-0.229167656, 0))
            Line((-0.229167656, 0), (0, 0))
            Line((0, 0), (0, 0.608618735))
        make_face()
    extrude(amount=SCHNITT_LINEAR_AUSTRAGEN17_DEPTH, mode=Mode.SUBTRACT)

    # Aufsatz-Linear austragen3: up to this plane
    aufsatz_linear_austragen3_end = Plane(origin=(-0.5159461, -13.7659461, 25.899170114), z_dir=(0.707106781186543, -0.707106781186552, 0))
    # Skizze20 → Aufsatz-Linear austragen3 (add, up to the surface)
    with BuildSketch(Plane.ZY, mode=Mode.PRIVATE) as aufsatz_linear_austragen3_sk1:
        Polygon((10, 2.3), (3.1, 2.3), (3.1, 0), align=None)
    aufsatz_linear_austragen3_tool1 = split(extrude(aufsatz_linear_austragen3_sk1.sketch, amount=-AUFSATZ_LINEAR_AUSTRAGEN3_REACH, mode=Mode.PRIVATE), bisect_by=aufsatz_linear_austragen3_end, keep=Keep.BOTH, mode=Mode.PRIVATE)
    add(aufsatz_linear_austragen3_tool1.solids().sort_by_distance((0, 1.533333, 5.4))[0])

    # Skizze21 → Schnitt-Linear austragen18 (cut)
    with BuildSketch(Plane(origin=(80, 0, 0), x_dir=(0, 0, -1), z_dir=(1, 0, 0))):
        with Locations((-5, -5)):
            Rectangle(SKIZZE21_W, SKIZZE21_H)
    extrude(amount=-SCHNITT_LINEAR_AUSTRAGEN18_DEPTH, mode=Mode.SUBTRACT)

    # Schnitt-Linear austragen19: up to this cylinder (the profile starts outside it)
    schnitt_linear_austragen19_end = Plane(origin=(55.75, -2, 15), z_dir=(0, 1, 0)) * Cylinder(SCHNITT_LINEAR_AUSTRAGEN19_END_RADIUS, 162.848, mode=Mode.PRIVATE)
    # Skizze22 → Schnitt-Linear austragen19 (cut, up to the surface)
    with BuildSketch(Plane(origin=(68.5, 0, 0), x_dir=(0, 0, -1), z_dir=(1, 0, 0)), mode=Mode.PRIVATE) as schnitt_linear_austragen19_sk1:
        with Locations((-15, -2)):
            Circle(SKIZZE22_R)
    schnitt_linear_austragen19_tool1 = extrude(schnitt_linear_austragen19_sk1.sketch, amount=-SCHNITT_LINEAR_AUSTRAGEN19_REACH, mode=Mode.PRIVATE) - schnitt_linear_austragen19_end
    add(schnitt_linear_austragen19_tool1.solids().sort_by_distance((68.5, -2, 15))[0], mode=Mode.SUBTRACT)

    # Skizze23 → Schnitt-Linear austragen20 (cut)
    with BuildSketch(Plane(origin=(68.5, 0, 0), x_dir=(0, 0, -1), z_dir=(1, 0, 0))):
        with Locations((-15, -2)):
            Circle(SKIZZE23_R)
    extrude(amount=-SCHNITT_LINEAR_AUSTRAGEN20_DEPTH, mode=Mode.SUBTRACT)

    # Fase2
    fase2_edges = [part.edges().sort_by_distance(p)[0] for p in [
        (68.5, 5, 22),
    ]]
    fase2_side = [part.faces().sort_by_distance(p)[0] for p in [
        (68.5, 5.5966386, 16.085234086),
    ]]
    chamfer(fase2_edges, length=FASE2_SIZE, length2=FASE2_SIZE2, reference=fase2_side[0])

    # Skizze24 → Aufsatz-Linear austragen4 (add)
    with BuildSketch(Plane(origin=(80, 0, 0), x_dir=(0, 0, -1), z_dir=(1, 0, 0)).offset(AUFSATZ_LINEAR_START_2)):
        Polygon((2, 11), (0, 13), (0, 7), (2, 7), align=None)
    extrude(amount=-AUFSATZ_LINEAR_AUSTRAGEN4_DEPTH)

    # Fase3: one chamfer whose edges measure the first distance from different faces: ONE call of the kernel's chamfer builder (chamfer() names one face for all edges)
    fase3_edges_1 = [part.edges().sort_by_distance(p)[0] for p in [
        (80, 20, 5),
        (0, 20, 5),
    ]]
    fase3_side_1 = [part.faces().sort_by_distance(p)[0] for p in [
        (40.691863388, 20, 8.699373831),
    ]]
    fase3_edges_2 = [part.edges().sort_by_distance(p)[0] for p in [
        (68.5, -10, 14.5),
    ]]
    fase3_side_2 = [part.faces().sort_by_distance(p)[0] for p in [
        (68.5, 5.818780812, 14.441515656),
    ]]
    fase3_edges_3 = [part.edges().sort_by_distance(p)[0] for p in [
        (0, 0, 1.549999795),
    ]]
    fase3_side_3 = [part.faces().sort_by_distance(p)[0] for p in [
        (15.125, 0, 1.55),
    ]]
    fase3_edges_4 = [part.edges().sort_by_distance(p)[0] for p in [
        (80, 0, 5),
    ]]
    fase3_side_4 = [part.faces().sort_by_distance(p)[0] for p in [
        (63.645982635, 0, 4.651763949),
    ]]
    fase3 = BRepFilletAPI_MakeChamfer(part.part.solid().wrapped)
    for e in fase3_edges_1:
        fase3.Add(FASE3_SIZE, FASE3_SIZE2, e.wrapped, fase3_side_1[0].wrapped)  # the first distance lies on this face
    for e in fase3_edges_2:
        fase3.Add(FASE3_SIZE, FASE3_SIZE2, e.wrapped, fase3_side_2[0].wrapped)  # the first distance lies on this face
    for e in fase3_edges_3:
        fase3.Add(FASE3_SIZE, FASE3_SIZE2, e.wrapped, fase3_side_3[0].wrapped)  # the first distance lies on this face
    for e in fase3_edges_4:
        fase3.Add(FASE3_SIZE, FASE3_SIZE2, e.wrapped, fase3_side_4[0].wrapped)  # the first distance lies on this face
    add(Compound.cast(fase3.Shape()), mode=Mode.REPLACE)

    # Fase4
    fase4_edges = [part.edges().sort_by_distance(p)[0] for p in [
        (59.975, 0, 10),
    ]]
    fase4_side = [part.faces().sort_by_distance(p)[0] for p in [
        (62.113288749, 0, 4.615831632),
    ]]
    chamfer(fase4_edges, length=FASE4_SIZE, length2=FASE4_SIZE2, reference=fase4_side[0])

    # Skizze28 → Schnitt-Linear austragen23 (cut)
    with BuildSketch(Plane(origin=(0, 0, 0), x_dir=(-1, 0, 0), z_dir=(0, 0, -1))):
        Polygon((-30.25, 6.691381265), (-23.558618735, 0), (-47.941381265, 0), (-41.25, 6.691381265), align=None)
    extrude(amount=-SCHNITT_LINEAR_AUSTRAGEN23_DEPTH, mode=Mode.SUBTRACT)


with BuildPart() as body_2:
    # Spiegeln1: mirrored copy
    add(part.part.mirror(Plane(origin=(80, 0, -20), x_dir=(0, 0, 1), z_dir=(1, 0, 0))))

    # Skizze27 → Schnitt-Linear austragen22 (cut)
    with BuildSketch(Plane.XY.offset(22)):
        Polygon((105.325778558, 9.780127019), (107.490842068, 9.780127019), (101.971226825, 0.219872981), (99.806163316, 0.219872981), align=None)
        Polygon((100.995651539, 9.780127019), (103.160715049, 9.780127019), (100.400907428, 5), (98.235843918, 5), align=None)
        Polygon((106.896097956, 5), (104.136290335, 0.219872981), (106.301353844, 0.219872981), (109.061161466, 5), align=None)
    extrude(amount=-SCHNITT_LINEAR_AUSTRAGEN22_DEPTH, mode=Mode.SUBTRACT)


with BuildPart() as body_2_1:
    # Körper-Verschieben/Kopieren1: moved
    add(body_2.part.rotate(Axis((0, 5, 10), (-1, 0, 0)), K_RPER_VERSCHIEBEN_KOPIEREN1_ANGLE))


solid = body_2_1.part
